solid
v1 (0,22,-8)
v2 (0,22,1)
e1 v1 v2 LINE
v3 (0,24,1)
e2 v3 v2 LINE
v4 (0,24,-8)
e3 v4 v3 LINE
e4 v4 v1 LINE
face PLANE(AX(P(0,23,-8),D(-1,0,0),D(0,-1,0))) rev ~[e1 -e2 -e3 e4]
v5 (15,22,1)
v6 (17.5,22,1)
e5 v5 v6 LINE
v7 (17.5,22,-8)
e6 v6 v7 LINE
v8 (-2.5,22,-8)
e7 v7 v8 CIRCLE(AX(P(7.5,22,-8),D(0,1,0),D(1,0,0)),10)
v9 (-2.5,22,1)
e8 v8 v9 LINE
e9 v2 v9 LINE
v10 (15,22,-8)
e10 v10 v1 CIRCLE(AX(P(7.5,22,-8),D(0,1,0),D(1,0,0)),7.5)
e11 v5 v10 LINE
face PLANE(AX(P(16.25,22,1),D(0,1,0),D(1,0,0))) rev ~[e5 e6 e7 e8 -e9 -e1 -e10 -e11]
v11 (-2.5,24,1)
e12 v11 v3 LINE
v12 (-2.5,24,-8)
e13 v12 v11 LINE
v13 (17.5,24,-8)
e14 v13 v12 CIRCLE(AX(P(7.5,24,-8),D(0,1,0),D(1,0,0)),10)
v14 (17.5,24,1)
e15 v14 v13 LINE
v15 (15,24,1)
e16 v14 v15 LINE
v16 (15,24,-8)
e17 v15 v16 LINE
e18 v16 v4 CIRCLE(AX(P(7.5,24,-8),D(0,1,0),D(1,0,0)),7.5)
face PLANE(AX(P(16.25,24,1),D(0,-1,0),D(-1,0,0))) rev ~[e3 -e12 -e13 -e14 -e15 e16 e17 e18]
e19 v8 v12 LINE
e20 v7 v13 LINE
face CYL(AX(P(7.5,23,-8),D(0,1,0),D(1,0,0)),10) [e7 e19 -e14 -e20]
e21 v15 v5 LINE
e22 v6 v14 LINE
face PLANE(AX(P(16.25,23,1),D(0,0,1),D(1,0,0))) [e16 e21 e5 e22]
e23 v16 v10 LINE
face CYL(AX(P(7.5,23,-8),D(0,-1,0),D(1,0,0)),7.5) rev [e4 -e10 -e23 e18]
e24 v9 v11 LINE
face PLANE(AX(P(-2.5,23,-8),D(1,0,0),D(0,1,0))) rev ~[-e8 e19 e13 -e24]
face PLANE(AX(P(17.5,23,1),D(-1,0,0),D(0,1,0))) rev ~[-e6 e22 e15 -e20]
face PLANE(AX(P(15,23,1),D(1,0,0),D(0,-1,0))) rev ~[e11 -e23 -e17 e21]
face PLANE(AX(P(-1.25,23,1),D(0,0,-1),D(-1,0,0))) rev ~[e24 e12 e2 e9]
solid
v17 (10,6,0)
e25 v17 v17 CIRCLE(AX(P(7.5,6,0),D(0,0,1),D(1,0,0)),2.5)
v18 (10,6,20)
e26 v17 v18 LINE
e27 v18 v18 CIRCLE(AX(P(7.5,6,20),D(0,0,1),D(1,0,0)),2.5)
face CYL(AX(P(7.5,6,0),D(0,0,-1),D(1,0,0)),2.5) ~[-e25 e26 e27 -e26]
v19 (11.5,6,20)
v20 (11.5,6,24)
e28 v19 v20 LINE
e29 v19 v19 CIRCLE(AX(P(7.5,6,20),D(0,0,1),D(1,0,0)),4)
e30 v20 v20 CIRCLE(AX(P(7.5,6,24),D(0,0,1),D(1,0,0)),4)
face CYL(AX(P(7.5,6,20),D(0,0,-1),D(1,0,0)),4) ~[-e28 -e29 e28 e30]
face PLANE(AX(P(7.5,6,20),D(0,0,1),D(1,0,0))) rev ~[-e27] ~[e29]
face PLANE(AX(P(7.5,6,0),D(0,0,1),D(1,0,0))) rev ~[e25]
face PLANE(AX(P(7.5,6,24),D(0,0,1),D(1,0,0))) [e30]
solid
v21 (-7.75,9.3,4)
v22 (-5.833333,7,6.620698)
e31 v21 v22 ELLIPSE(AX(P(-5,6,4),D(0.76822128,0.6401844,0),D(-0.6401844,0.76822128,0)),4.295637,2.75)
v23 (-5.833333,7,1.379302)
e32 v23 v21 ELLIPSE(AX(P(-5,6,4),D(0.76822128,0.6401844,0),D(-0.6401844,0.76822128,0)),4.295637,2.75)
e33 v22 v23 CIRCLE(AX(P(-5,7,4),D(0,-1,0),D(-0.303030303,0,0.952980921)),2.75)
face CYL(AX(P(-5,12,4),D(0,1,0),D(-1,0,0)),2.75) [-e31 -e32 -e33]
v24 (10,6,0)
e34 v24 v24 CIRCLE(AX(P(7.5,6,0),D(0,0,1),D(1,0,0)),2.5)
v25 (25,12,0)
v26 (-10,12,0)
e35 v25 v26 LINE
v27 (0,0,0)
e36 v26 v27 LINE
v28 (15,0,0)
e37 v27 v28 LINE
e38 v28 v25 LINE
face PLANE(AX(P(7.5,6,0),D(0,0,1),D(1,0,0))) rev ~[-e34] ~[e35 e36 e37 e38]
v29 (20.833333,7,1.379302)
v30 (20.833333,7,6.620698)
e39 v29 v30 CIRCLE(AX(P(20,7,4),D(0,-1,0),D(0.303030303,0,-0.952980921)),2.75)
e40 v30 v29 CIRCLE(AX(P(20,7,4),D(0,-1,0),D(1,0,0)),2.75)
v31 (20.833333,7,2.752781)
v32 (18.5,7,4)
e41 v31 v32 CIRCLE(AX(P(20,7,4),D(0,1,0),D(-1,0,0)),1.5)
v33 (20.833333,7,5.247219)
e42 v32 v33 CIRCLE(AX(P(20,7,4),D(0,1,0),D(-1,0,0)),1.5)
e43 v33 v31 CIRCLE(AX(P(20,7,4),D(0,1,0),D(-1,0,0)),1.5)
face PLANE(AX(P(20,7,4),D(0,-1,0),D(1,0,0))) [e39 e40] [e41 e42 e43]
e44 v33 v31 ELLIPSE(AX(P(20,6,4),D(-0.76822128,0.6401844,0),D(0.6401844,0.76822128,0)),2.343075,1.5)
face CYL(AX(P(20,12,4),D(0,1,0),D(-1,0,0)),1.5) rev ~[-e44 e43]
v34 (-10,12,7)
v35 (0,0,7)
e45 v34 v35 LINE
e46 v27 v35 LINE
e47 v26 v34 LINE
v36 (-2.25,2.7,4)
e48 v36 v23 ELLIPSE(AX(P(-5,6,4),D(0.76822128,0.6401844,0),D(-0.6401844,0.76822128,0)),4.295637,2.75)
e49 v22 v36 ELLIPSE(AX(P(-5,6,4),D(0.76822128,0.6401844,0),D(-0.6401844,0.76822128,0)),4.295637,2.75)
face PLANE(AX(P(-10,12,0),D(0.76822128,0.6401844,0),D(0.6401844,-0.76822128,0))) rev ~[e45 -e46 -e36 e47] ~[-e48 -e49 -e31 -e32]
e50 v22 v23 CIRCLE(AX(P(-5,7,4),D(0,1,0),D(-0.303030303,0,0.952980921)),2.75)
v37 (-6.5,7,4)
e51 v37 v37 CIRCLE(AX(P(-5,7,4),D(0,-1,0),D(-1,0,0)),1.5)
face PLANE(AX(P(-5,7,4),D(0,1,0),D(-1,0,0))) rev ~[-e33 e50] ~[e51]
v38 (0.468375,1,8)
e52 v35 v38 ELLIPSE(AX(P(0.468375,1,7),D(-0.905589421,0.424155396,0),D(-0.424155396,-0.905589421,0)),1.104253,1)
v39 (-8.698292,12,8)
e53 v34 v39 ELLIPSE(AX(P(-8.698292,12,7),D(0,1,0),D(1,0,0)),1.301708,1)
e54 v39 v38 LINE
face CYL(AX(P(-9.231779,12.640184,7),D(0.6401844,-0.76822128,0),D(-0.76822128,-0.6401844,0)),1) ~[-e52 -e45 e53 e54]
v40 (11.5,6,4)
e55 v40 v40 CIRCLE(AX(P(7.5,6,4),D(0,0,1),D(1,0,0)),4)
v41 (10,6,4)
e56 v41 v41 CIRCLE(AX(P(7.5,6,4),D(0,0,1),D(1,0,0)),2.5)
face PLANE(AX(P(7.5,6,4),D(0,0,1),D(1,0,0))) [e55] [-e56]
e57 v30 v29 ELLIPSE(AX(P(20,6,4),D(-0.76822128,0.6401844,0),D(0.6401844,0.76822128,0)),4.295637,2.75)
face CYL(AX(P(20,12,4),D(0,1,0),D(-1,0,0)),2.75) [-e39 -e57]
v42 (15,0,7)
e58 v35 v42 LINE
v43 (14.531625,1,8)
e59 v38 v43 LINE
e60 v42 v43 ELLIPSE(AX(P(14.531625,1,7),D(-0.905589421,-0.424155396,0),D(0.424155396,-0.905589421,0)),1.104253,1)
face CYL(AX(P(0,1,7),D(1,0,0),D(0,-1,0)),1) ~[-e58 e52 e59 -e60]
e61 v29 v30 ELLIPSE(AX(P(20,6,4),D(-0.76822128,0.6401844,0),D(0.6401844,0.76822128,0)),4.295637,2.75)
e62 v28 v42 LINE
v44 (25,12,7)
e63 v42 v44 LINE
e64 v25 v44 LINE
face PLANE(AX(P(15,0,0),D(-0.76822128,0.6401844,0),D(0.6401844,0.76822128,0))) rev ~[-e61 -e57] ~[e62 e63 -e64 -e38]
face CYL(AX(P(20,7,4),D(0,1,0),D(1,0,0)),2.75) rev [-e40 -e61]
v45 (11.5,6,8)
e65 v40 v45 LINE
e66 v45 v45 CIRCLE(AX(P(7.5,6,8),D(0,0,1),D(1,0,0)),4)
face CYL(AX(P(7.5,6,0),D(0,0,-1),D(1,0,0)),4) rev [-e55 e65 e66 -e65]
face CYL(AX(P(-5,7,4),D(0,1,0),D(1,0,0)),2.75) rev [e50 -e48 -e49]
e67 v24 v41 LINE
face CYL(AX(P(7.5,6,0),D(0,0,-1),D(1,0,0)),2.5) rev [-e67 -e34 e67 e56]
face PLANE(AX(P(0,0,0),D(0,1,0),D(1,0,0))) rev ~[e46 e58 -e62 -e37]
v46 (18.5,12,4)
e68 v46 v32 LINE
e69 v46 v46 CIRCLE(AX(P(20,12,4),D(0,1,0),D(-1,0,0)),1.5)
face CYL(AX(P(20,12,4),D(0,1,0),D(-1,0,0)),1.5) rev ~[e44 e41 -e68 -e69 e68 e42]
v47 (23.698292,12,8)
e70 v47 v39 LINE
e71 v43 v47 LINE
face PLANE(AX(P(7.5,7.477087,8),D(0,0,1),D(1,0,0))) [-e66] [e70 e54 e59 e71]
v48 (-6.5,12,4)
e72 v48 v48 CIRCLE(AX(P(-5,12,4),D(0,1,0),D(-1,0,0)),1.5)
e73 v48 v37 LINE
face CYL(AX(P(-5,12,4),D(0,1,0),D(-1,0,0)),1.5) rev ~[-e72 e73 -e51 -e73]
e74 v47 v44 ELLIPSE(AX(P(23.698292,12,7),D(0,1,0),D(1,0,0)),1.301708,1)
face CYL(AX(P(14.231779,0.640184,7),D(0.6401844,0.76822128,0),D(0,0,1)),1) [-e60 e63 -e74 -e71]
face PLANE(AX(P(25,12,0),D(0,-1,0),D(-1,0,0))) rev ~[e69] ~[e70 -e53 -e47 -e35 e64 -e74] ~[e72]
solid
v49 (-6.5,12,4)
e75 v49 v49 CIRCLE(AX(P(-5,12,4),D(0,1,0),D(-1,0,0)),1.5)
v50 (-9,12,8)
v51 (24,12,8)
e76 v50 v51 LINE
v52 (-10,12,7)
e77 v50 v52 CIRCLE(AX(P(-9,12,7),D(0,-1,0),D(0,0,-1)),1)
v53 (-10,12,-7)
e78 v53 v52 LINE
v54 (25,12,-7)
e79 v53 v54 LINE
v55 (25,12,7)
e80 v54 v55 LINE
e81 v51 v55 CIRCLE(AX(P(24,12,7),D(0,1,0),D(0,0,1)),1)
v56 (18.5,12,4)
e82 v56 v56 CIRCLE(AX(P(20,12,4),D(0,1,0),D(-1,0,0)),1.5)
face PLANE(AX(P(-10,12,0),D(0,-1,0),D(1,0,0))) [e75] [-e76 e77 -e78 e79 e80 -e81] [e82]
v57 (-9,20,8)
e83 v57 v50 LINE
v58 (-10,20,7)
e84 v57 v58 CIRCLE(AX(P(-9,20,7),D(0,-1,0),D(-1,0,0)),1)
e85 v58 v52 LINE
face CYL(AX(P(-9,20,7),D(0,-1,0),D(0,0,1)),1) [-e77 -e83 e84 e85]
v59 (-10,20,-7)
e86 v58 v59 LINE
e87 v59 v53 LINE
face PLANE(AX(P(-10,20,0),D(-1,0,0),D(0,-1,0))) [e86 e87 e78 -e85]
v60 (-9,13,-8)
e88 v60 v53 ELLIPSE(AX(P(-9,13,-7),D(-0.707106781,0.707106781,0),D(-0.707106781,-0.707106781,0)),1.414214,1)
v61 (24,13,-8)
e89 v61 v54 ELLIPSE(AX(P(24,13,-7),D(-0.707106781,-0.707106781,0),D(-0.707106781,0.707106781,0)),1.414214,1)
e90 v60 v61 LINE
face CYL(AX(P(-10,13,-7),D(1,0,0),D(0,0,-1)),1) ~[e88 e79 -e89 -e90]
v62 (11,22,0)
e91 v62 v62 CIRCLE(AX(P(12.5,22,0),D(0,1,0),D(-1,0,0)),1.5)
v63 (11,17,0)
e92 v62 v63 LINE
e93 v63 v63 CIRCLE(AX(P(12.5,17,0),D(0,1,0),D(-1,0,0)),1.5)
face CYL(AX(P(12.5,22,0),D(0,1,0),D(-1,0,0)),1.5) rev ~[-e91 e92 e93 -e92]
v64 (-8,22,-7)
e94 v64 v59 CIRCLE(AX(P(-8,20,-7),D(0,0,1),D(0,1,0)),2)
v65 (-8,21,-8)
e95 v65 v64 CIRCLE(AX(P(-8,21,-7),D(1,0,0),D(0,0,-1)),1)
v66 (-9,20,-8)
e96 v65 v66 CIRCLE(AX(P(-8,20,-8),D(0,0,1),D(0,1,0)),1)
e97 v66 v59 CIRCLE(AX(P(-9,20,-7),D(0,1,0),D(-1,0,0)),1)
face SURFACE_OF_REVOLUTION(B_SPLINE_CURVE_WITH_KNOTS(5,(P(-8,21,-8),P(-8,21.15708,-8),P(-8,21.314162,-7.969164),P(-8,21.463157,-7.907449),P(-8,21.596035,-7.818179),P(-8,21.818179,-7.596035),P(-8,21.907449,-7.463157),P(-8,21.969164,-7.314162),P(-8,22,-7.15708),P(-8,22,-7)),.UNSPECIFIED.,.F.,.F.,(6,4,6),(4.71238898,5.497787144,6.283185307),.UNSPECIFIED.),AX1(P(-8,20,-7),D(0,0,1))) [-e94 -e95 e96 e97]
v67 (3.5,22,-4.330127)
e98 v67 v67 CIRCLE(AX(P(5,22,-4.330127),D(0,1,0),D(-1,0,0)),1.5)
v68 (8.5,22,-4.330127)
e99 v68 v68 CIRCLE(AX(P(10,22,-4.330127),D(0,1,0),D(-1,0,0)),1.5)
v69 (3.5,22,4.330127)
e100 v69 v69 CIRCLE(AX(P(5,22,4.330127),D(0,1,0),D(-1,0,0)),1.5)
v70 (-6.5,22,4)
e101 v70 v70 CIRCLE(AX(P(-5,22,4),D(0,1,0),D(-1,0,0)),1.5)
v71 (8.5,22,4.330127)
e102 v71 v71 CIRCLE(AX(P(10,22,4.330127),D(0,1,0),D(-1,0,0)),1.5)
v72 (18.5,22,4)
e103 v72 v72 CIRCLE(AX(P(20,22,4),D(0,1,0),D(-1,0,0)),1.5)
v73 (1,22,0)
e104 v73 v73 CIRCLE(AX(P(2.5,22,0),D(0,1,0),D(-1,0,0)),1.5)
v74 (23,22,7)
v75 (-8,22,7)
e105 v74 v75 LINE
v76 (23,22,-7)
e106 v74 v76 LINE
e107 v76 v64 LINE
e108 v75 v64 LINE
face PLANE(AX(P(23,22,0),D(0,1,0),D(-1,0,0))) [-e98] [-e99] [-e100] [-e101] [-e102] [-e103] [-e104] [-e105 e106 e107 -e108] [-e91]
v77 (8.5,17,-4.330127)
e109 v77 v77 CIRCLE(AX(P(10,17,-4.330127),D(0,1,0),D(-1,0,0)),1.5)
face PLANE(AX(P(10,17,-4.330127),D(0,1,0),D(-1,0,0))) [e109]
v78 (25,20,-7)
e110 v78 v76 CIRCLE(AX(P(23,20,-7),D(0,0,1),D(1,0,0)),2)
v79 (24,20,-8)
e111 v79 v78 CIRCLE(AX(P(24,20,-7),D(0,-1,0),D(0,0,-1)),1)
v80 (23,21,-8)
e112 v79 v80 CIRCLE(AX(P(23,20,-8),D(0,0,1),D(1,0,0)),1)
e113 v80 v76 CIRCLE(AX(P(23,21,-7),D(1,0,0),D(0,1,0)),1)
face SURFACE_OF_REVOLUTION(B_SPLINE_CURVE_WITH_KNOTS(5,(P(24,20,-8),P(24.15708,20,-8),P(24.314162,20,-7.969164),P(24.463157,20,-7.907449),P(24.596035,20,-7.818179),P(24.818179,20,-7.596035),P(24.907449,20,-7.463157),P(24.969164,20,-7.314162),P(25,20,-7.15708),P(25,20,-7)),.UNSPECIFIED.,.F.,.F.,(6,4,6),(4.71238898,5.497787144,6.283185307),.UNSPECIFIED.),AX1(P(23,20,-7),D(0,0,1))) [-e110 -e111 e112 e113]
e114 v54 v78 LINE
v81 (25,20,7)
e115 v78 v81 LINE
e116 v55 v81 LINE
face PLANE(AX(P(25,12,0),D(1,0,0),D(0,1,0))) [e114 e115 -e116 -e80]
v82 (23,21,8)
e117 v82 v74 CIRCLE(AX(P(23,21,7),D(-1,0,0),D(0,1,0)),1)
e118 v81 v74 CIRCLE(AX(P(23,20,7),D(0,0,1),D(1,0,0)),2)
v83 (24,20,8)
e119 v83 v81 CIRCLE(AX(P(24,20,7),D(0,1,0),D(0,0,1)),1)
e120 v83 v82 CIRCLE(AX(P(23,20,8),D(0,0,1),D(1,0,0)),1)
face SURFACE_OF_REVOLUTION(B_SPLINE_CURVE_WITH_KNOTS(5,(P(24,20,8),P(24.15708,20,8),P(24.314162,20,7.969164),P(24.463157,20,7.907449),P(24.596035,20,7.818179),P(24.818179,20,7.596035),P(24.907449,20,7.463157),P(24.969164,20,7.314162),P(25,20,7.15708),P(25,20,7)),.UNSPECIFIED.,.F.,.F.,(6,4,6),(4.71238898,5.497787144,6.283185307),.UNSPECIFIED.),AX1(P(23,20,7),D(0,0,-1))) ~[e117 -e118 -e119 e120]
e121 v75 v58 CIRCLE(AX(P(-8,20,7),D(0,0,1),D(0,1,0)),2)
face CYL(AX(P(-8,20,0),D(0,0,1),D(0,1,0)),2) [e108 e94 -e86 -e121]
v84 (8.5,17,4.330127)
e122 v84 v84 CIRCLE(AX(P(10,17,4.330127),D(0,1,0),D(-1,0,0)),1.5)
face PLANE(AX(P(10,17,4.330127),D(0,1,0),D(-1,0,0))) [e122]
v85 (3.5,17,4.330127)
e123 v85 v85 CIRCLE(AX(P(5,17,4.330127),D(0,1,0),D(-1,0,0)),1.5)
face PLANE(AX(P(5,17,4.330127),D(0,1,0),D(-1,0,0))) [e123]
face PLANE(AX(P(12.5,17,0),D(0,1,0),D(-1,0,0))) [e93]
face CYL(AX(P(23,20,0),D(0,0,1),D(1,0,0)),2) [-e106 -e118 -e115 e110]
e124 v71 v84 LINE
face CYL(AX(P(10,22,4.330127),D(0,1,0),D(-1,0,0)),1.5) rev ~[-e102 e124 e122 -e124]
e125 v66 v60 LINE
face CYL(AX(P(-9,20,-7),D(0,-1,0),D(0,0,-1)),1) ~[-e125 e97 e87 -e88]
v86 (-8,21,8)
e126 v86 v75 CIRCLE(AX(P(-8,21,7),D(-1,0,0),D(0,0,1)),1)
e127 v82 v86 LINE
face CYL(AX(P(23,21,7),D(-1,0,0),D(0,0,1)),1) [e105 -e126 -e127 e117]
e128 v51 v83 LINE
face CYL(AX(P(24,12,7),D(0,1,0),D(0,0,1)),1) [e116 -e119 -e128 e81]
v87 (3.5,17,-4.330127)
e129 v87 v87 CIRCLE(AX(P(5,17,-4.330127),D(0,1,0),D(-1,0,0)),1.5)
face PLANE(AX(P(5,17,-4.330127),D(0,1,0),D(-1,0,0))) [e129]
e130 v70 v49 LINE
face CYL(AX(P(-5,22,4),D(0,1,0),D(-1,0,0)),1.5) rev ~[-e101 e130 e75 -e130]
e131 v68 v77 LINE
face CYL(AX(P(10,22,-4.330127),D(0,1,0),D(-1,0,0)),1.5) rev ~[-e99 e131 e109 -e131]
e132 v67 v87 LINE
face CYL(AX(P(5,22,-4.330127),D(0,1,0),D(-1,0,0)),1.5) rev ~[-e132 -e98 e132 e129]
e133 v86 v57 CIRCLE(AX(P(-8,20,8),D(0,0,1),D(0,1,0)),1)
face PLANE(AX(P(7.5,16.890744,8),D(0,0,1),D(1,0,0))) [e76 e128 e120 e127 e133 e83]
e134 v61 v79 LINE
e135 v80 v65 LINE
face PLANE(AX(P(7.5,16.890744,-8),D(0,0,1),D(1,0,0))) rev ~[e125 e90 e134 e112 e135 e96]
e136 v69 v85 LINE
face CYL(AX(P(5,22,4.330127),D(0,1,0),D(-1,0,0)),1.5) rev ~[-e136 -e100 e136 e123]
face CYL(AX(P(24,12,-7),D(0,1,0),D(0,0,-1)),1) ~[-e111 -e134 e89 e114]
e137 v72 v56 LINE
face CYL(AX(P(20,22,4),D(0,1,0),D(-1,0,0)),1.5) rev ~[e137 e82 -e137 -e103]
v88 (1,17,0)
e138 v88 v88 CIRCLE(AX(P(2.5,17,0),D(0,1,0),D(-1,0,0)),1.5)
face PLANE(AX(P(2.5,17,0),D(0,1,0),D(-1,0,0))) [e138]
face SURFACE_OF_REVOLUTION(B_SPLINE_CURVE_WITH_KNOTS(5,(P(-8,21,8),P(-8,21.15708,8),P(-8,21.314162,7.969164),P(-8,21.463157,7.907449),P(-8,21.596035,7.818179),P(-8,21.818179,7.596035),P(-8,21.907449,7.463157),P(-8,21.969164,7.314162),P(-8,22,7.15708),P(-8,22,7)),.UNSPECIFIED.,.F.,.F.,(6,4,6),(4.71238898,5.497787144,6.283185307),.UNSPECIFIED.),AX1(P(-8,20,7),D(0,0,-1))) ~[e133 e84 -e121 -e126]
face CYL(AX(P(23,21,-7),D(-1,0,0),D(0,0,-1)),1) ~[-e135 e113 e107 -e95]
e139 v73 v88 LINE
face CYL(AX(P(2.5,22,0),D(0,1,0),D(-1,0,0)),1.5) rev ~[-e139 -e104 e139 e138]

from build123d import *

# Parameters (mm, degrees)
F0_R      = 4
F1_DEPTH  = 8
F0_R_2    = 2.5
F2_DEPTH  = 4
F3_DEPTH  = 20
F4_R      = 4
F5_DEPTH  = 4
F6_R      = 1.5
F7_DEPTH  = 12.001
F6_R_2    = 2.75
F8_DEPTH  = 5
F9_R      = 2.75
F10_DEPTH = 7.001
F11_R     = 1
F12_DEPTH = 8
F13_R     = 1.5
F14_DEPTH = 22.001
F15_DEPTH = 5
F16_R     = 1
F17_E39_W = 2.5
F17_E39_H = 2


with BuildPart() as f1:
    # F0 (on Top) → F1 (new body)
    with BuildSketch(Plane.XY):
        Polygon((-10, 12), (0, 0), (15, 0), (25, 12), (15, 12), (0, 12), align=None)
        with Locations((7.5, 6)):
            Circle(F0_R, mode=Mode.SUBTRACT)
    extrude(amount=F1_DEPTH)

    # F0 (on Top) → F2 (join)
    with BuildSketch(Plane.XY):
        with Locations((7.5, 6)):
            Circle(F0_R)
        with Locations((7.5, 6)):
            Circle(F0_R_2, mode=Mode.SUBTRACT)
    extrude(amount=F2_DEPTH)

    # F6 (on face) → F7 (cut, through all)
    with BuildSketch(Plane(origin=(0, 12, 0), x_dir=(-1, 0, 0), z_dir=(0, 1, 0))):
        with Locations((-20, 4)):
            Circle(F6_R)
        with Locations((5, 4)):
            Circle(F6_R)
    extrude(amount=-F7_DEPTH, mode=Mode.SUBTRACT)

    # F6 (on face) → F8 (join)
    with BuildSketch(Plane(origin=(0, 12, 0), x_dir=(-1, 0, 0), z_dir=(0, 1, 0))):
        with Locations((-20, 4)):
            Circle(F6_R_2)
        with Locations((-20, 4)):
            Circle(F6_R, mode=Mode.SUBTRACT)
        with Locations((5, 4)):
            Circle(F6_R_2)
        with Locations((5, 4)):
            Circle(F6_R, mode=Mode.SUBTRACT)
    extrude(amount=-F8_DEPTH)

    # F9 (on face) → F10 (cut, through all)
    with BuildSketch(Plane.XZ.offset(-7)):
        with Locations((20, 4)):
            Circle(F9_R)
        with Locations((-5, 4)):
            Circle(F9_R)
    extrude(amount=F10_DEPTH, mode=Mode.SUBTRACT)

    # F11
    f11_edges = [f1.edges().sort_by_distance(p)[0] for p in [
        (-5, 6, 8),
        (7.5, 0, 8),
        (20, 6, 8),
    ]]
    fillet(f11_edges, radius=F11_R)


with BuildPart() as f3:
    # F0 (on Top) → F3 (new body)
    with BuildSketch(Plane.XY):
        with Locations((7.5, 6)):
            Circle(F0_R_2)
    extrude(amount=F3_DEPTH)

    # F4 (on face) → F5 (join)
    with BuildSketch(Plane.XY.offset(20)):
        with Locations((7.5, 6)):
            Circle(F4_R)
    extrude(amount=F5_DEPTH)


with BuildPart() as f12:
    # F0 (on Top) → F12 (new body, symmetric)
    with BuildSketch(Plane.XY):
        with BuildLine():
            Line((-10, 20), (-10, 12))
            Line((-10, 12), (0, 12))
            Line((0, 12), (15, 12))
            Line((15, 12), (25, 12))
            Line((25, 12), (25, 20))
            ThreePointArc((25, 20), (24.4142135624, 21.4142135624), (23, 22))
            Line((23, 22), (-8, 22))
            ThreePointArc((-8, 22), (-9.4142135624, 21.4142135624), (-10, 20))
        make_face()
    extrude(amount=F12_DEPTH, both=True)

    # F13 (on face) → F14 (cut, through all)
    with BuildSketch(Plane(origin=(0, 22, 0), x_dir=(-1, 0, 0), z_dir=(0, 1, 0))):
        with Locations((-20, 4)):
            Circle(F13_R)
        with Locations((5, 4)):
            Circle(F13_R)
    extrude(amount=-F14_DEPTH, mode=Mode.SUBTRACT)

    # F13 (on face) → F15 (cut)
    with BuildSketch(Plane(origin=(0, 22, 0), x_dir=(-1, 0, 0), z_dir=(0, 1, 0))):
        with Locations((-10, 4.3301270189)):
            Circle(F13_R)
        with Locations((-12.5, 0)):
            Circle(F13_R)
        with Locations((-5, 4.3301270189)):
            Circle(F13_R)
        with Locations((-10, -4.3301270189)):
            Circle(F13_R)
        with Locations((-5, -4.3301270189)):
            Circle(F13_R)
        with Locations((-2.5, 0)):
            Circle(F13_R)
    extrude(amount=-F15_DEPTH, mode=Mode.SUBTRACT)

    # F16
    f16_edges = [f12.edges().sort_by_distance(p)[0] for p in [
        (25, 16, 8),
        (25, 16, -8),
        (7.5, 12, -8),
    ]]
    fillet(f16_edges, radius=F16_R)


with BuildPart() as f18:
    # F18: sweep along a path in F13
    with BuildLine(Plane(origin=(0, 22, 0), x_dir=(-1, 0, 0), z_dir=(0, 1, 0))) as f18_path:
        Line((-16.25, 1), (-16.25, -8))
        ThreePointArc((-16.25, -8), (-7.5, -16.75), (1.25, -8))
        Line((1.25, -8), (1.25, 1))
    # F17_E39 (on explicit) → F18 (sweep)
    with BuildSketch(Plane(origin=(15, 22, 1), x_dir=(1, 0, 0), z_dir=(0, 0, 1))):
        with Locations((1.25, 1)):
            Rectangle(F17_E39_W, F17_E39_H)
    sweep(path=f18_path.line)


solid = Compound([f1.part, f3.part, f12.part, f18.part])
